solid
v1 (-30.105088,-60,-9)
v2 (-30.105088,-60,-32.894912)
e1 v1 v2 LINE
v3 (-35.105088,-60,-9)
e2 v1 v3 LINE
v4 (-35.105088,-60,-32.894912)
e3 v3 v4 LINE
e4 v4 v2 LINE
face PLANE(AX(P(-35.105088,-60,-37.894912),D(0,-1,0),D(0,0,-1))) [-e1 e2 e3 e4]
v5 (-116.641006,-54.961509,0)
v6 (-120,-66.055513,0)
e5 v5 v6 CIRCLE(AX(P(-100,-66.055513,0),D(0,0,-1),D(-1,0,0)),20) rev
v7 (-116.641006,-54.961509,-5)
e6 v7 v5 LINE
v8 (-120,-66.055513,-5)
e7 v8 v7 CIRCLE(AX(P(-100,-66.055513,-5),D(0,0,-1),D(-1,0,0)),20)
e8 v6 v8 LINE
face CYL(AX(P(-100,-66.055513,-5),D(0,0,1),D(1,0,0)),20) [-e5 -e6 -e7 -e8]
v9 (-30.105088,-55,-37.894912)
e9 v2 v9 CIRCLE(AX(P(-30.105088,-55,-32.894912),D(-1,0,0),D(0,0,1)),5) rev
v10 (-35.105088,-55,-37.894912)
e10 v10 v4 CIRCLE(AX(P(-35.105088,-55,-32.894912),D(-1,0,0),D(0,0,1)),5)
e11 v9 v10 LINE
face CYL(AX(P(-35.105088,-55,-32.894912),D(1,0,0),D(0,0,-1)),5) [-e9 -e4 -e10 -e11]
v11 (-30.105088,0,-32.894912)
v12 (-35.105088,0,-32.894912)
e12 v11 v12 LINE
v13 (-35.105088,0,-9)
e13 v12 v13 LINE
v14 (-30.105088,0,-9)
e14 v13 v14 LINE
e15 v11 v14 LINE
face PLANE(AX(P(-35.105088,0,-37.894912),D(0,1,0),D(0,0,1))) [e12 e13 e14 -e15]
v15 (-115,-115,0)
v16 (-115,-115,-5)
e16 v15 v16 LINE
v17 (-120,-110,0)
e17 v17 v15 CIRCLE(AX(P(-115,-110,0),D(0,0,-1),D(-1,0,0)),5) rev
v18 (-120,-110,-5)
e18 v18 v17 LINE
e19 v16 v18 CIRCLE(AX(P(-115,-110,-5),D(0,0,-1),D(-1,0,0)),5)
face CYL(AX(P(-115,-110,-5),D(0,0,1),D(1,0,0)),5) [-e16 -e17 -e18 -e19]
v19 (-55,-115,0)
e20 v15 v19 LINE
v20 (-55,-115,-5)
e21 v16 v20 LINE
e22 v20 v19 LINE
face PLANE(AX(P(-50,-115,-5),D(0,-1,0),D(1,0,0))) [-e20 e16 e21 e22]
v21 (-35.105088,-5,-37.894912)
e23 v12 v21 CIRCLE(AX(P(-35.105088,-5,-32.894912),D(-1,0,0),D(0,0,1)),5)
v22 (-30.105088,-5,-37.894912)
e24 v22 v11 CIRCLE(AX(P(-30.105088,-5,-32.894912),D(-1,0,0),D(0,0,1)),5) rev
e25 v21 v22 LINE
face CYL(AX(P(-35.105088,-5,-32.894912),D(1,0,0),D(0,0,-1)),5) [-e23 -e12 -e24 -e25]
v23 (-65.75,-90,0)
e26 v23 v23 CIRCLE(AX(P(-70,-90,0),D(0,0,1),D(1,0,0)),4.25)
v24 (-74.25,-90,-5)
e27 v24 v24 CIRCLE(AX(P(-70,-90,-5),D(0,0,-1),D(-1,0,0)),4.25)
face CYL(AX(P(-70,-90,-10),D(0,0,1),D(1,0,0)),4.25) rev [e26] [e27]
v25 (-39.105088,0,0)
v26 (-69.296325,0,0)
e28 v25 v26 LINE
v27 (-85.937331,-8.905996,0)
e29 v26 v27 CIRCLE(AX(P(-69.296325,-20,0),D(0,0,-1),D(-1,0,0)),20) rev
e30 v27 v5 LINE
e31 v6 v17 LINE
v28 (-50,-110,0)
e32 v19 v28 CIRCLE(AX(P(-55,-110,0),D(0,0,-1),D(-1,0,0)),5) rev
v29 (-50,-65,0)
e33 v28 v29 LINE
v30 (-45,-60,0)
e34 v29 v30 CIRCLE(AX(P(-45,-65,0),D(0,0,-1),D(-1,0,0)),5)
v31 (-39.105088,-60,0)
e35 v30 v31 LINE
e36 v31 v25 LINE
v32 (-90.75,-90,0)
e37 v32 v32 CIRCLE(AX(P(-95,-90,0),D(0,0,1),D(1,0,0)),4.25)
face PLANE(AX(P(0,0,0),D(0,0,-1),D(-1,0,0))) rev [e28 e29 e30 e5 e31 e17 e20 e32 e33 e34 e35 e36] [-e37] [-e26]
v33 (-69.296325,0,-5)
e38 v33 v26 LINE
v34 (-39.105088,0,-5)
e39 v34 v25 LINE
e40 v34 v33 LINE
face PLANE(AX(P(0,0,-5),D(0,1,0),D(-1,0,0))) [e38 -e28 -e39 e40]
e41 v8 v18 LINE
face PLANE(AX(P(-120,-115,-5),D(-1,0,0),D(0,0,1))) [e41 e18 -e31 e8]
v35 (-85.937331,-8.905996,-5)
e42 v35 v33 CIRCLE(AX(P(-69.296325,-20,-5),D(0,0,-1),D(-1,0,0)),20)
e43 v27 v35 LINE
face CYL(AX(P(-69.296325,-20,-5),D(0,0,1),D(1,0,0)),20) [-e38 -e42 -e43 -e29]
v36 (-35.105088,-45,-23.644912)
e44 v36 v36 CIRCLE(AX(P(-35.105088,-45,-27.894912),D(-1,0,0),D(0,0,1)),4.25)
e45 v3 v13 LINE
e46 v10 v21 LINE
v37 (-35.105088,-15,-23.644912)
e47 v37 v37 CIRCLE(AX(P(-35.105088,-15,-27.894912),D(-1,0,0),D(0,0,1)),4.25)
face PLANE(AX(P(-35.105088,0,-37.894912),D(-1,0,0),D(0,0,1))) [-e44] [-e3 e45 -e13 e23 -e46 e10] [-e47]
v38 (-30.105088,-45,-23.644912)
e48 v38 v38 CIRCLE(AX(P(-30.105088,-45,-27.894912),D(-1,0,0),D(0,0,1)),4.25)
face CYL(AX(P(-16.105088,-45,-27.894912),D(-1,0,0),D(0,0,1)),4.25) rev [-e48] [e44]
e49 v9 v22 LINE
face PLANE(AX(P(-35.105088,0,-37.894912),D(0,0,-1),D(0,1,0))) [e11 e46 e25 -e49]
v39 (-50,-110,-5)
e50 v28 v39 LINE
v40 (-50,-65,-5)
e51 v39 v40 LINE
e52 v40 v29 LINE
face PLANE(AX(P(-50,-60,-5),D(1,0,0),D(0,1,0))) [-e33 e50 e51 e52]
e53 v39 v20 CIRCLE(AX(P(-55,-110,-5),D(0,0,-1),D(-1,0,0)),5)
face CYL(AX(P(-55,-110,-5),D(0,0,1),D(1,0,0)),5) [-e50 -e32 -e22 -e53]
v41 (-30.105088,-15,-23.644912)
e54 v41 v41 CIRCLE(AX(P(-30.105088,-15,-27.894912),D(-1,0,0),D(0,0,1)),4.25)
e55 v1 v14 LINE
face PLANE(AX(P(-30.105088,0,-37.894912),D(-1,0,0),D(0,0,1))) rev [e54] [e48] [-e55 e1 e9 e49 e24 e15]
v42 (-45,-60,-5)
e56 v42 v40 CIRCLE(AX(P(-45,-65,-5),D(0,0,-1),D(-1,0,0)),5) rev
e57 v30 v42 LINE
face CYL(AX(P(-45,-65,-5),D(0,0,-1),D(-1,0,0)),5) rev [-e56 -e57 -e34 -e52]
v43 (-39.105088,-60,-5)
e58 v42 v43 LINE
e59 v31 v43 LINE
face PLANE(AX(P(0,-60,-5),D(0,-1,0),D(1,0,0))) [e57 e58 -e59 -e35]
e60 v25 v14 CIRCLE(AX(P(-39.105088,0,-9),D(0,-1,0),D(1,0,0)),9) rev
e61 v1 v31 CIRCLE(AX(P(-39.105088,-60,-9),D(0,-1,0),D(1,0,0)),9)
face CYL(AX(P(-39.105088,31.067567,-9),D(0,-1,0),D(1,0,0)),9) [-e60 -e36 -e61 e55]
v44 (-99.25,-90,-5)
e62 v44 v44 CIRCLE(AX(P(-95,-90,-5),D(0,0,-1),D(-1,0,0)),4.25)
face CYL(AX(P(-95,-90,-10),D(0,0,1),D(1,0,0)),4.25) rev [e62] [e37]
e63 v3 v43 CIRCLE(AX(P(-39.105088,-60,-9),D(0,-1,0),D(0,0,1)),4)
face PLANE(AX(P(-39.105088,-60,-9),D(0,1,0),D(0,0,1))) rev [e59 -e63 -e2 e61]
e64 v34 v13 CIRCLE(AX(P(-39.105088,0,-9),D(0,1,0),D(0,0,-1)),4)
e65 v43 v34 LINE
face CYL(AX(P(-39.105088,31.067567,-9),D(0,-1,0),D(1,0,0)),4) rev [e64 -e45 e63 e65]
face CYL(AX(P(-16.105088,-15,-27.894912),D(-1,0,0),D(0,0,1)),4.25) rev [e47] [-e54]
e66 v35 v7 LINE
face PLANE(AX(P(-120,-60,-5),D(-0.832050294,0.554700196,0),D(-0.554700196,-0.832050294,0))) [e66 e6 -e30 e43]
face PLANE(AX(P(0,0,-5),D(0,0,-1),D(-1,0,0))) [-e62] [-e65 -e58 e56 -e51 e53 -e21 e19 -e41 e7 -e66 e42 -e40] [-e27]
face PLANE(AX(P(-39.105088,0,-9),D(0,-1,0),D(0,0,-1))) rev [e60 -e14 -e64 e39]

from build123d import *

# Parameters (mm, degrees)
TABAN_FLAN_1_DEPTH     = 5
IZGIDEN_START          = -60
IZGIDEN_B_KME2_DEPTH   = 60
IZGIDEN_B_KME2_2_DEPTH = 60
IZIM8_R                = 4.25
KES_EKSTR_ZYON1_DEPTH  = 10
RADYUS1_R              = 20
RADYUS2_R              = 5
IZIM9_R                = 4.25
KES_EKSTR_ZYON2_DEPTH  = 19


# Read off the part's stored shape, not the designer's step: Çizgiden Bükme2
# Sheet-metal steps are written as plain solids
with BuildPart() as part:
    # Çizim1 → Taban-Flanş1 (new body)
    with BuildSketch(Plane.XY):
        Polygon((0, 0), (-80, 0), (-120, -60), (-120, -115), (-50, -115), (-50, -60), (0, -60), align=None)
    extrude(amount=-TABAN_FLAN_1_DEPTH)

    # Çizgiden Bükme2 outline → Çizgiden Bükme2 (cut)
    with BuildSketch(Plane(origin=(0, 0, 0), x_dir=(1, 0, 0), z_dir=(0, 1, 0)).offset(IZGIDEN_START)):
        with BuildLine():
            Line((0, 5), (-31.042830313, 5))
            ThreePointArc((-31.042830313, 5), (-34.361671571, 1.351470729), (-39.105088062, 0))
            Line((-39.105088062, 0), (0, 0))
            Line((0, 0), (0, 5))
        make_face()
    extrude(amount=IZGIDEN_B_KME2_DEPTH, mode=Mode.SUBTRACT)

    # izgiden B_kme2 2 outline → izgiden B_kme2 2 (add)
    with BuildSketch(Plane(origin=(0, 0, 0), x_dir=(1, 0, 0), z_dir=(0, 1, 0)).offset(IZGIDEN_START)):
        with BuildLine():
            Line((-30.105088062, 37.894911938), (-35.105088062, 37.894911938))
            Line((-35.105088062, 37.894911938), (-35.105088062, 9))
            ThreePointArc((-35.105088062, 9), (-36.276660937, 6.171572875), (-39.105088062, 5))
            Line((-39.105088062, 5), (-31.042830313, 5))
            ThreePointArc((-31.042830313, 5), (-30.342659182, 6.945775053), (-30.105088062, 9))
            Line((-30.105088062, 9), (-30.105088062, 37.894911938))
        make_face()
    extrude(amount=IZGIDEN_B_KME2_2_DEPTH)

    # Çizim8 → Kes-Ekstrüzyon1 (cut)
    with BuildSketch(Plane.XY):
        with Locations((-70, -90)):
            Circle(IZIM8_R)
        with Locations((-95, -90)):
            Circle(IZIM8_R)
    extrude(amount=-KES_EKSTR_ZYON1_DEPTH, mode=Mode.SUBTRACT)

    # Radyus1
    radyus1_edges = [part.edges().sort_by_distance(p)[0] for p in [
        (-120, -60, -2.5),
        (-80, 0, -2.5),
    ]]
    fillet(radyus1_edges, radius=RADYUS1_R)

    # Radyus2
    radyus2_edges = [part.edges().sort_by_distance(p)[0] for p in [
        (-32.605088062, -60, -37.894911938),
        (-32.605088062, 0, -37.894911938),
        (-120, -115, -2.5),
        (-50, -115, -2.5),
        (-50, -60, -2.5),
    ]]
    fillet(radyus2_edges, radius=RADYUS2_R)

    # Çizim9 → Kes-Ekstrüzyon2 (cut)
    with BuildSketch(Plane.ZY.offset(35.105088062)):
        with Locations((-27.894911938, -15)):
            Circle(IZIM9_R)
        with Locations((-27.894911938, -45)):
            Circle(IZIM9_R)
    extrude(amount=-KES_EKSTR_ZYON2_DEPTH, mode=Mode.SUBTRACT)


solid = part.part
